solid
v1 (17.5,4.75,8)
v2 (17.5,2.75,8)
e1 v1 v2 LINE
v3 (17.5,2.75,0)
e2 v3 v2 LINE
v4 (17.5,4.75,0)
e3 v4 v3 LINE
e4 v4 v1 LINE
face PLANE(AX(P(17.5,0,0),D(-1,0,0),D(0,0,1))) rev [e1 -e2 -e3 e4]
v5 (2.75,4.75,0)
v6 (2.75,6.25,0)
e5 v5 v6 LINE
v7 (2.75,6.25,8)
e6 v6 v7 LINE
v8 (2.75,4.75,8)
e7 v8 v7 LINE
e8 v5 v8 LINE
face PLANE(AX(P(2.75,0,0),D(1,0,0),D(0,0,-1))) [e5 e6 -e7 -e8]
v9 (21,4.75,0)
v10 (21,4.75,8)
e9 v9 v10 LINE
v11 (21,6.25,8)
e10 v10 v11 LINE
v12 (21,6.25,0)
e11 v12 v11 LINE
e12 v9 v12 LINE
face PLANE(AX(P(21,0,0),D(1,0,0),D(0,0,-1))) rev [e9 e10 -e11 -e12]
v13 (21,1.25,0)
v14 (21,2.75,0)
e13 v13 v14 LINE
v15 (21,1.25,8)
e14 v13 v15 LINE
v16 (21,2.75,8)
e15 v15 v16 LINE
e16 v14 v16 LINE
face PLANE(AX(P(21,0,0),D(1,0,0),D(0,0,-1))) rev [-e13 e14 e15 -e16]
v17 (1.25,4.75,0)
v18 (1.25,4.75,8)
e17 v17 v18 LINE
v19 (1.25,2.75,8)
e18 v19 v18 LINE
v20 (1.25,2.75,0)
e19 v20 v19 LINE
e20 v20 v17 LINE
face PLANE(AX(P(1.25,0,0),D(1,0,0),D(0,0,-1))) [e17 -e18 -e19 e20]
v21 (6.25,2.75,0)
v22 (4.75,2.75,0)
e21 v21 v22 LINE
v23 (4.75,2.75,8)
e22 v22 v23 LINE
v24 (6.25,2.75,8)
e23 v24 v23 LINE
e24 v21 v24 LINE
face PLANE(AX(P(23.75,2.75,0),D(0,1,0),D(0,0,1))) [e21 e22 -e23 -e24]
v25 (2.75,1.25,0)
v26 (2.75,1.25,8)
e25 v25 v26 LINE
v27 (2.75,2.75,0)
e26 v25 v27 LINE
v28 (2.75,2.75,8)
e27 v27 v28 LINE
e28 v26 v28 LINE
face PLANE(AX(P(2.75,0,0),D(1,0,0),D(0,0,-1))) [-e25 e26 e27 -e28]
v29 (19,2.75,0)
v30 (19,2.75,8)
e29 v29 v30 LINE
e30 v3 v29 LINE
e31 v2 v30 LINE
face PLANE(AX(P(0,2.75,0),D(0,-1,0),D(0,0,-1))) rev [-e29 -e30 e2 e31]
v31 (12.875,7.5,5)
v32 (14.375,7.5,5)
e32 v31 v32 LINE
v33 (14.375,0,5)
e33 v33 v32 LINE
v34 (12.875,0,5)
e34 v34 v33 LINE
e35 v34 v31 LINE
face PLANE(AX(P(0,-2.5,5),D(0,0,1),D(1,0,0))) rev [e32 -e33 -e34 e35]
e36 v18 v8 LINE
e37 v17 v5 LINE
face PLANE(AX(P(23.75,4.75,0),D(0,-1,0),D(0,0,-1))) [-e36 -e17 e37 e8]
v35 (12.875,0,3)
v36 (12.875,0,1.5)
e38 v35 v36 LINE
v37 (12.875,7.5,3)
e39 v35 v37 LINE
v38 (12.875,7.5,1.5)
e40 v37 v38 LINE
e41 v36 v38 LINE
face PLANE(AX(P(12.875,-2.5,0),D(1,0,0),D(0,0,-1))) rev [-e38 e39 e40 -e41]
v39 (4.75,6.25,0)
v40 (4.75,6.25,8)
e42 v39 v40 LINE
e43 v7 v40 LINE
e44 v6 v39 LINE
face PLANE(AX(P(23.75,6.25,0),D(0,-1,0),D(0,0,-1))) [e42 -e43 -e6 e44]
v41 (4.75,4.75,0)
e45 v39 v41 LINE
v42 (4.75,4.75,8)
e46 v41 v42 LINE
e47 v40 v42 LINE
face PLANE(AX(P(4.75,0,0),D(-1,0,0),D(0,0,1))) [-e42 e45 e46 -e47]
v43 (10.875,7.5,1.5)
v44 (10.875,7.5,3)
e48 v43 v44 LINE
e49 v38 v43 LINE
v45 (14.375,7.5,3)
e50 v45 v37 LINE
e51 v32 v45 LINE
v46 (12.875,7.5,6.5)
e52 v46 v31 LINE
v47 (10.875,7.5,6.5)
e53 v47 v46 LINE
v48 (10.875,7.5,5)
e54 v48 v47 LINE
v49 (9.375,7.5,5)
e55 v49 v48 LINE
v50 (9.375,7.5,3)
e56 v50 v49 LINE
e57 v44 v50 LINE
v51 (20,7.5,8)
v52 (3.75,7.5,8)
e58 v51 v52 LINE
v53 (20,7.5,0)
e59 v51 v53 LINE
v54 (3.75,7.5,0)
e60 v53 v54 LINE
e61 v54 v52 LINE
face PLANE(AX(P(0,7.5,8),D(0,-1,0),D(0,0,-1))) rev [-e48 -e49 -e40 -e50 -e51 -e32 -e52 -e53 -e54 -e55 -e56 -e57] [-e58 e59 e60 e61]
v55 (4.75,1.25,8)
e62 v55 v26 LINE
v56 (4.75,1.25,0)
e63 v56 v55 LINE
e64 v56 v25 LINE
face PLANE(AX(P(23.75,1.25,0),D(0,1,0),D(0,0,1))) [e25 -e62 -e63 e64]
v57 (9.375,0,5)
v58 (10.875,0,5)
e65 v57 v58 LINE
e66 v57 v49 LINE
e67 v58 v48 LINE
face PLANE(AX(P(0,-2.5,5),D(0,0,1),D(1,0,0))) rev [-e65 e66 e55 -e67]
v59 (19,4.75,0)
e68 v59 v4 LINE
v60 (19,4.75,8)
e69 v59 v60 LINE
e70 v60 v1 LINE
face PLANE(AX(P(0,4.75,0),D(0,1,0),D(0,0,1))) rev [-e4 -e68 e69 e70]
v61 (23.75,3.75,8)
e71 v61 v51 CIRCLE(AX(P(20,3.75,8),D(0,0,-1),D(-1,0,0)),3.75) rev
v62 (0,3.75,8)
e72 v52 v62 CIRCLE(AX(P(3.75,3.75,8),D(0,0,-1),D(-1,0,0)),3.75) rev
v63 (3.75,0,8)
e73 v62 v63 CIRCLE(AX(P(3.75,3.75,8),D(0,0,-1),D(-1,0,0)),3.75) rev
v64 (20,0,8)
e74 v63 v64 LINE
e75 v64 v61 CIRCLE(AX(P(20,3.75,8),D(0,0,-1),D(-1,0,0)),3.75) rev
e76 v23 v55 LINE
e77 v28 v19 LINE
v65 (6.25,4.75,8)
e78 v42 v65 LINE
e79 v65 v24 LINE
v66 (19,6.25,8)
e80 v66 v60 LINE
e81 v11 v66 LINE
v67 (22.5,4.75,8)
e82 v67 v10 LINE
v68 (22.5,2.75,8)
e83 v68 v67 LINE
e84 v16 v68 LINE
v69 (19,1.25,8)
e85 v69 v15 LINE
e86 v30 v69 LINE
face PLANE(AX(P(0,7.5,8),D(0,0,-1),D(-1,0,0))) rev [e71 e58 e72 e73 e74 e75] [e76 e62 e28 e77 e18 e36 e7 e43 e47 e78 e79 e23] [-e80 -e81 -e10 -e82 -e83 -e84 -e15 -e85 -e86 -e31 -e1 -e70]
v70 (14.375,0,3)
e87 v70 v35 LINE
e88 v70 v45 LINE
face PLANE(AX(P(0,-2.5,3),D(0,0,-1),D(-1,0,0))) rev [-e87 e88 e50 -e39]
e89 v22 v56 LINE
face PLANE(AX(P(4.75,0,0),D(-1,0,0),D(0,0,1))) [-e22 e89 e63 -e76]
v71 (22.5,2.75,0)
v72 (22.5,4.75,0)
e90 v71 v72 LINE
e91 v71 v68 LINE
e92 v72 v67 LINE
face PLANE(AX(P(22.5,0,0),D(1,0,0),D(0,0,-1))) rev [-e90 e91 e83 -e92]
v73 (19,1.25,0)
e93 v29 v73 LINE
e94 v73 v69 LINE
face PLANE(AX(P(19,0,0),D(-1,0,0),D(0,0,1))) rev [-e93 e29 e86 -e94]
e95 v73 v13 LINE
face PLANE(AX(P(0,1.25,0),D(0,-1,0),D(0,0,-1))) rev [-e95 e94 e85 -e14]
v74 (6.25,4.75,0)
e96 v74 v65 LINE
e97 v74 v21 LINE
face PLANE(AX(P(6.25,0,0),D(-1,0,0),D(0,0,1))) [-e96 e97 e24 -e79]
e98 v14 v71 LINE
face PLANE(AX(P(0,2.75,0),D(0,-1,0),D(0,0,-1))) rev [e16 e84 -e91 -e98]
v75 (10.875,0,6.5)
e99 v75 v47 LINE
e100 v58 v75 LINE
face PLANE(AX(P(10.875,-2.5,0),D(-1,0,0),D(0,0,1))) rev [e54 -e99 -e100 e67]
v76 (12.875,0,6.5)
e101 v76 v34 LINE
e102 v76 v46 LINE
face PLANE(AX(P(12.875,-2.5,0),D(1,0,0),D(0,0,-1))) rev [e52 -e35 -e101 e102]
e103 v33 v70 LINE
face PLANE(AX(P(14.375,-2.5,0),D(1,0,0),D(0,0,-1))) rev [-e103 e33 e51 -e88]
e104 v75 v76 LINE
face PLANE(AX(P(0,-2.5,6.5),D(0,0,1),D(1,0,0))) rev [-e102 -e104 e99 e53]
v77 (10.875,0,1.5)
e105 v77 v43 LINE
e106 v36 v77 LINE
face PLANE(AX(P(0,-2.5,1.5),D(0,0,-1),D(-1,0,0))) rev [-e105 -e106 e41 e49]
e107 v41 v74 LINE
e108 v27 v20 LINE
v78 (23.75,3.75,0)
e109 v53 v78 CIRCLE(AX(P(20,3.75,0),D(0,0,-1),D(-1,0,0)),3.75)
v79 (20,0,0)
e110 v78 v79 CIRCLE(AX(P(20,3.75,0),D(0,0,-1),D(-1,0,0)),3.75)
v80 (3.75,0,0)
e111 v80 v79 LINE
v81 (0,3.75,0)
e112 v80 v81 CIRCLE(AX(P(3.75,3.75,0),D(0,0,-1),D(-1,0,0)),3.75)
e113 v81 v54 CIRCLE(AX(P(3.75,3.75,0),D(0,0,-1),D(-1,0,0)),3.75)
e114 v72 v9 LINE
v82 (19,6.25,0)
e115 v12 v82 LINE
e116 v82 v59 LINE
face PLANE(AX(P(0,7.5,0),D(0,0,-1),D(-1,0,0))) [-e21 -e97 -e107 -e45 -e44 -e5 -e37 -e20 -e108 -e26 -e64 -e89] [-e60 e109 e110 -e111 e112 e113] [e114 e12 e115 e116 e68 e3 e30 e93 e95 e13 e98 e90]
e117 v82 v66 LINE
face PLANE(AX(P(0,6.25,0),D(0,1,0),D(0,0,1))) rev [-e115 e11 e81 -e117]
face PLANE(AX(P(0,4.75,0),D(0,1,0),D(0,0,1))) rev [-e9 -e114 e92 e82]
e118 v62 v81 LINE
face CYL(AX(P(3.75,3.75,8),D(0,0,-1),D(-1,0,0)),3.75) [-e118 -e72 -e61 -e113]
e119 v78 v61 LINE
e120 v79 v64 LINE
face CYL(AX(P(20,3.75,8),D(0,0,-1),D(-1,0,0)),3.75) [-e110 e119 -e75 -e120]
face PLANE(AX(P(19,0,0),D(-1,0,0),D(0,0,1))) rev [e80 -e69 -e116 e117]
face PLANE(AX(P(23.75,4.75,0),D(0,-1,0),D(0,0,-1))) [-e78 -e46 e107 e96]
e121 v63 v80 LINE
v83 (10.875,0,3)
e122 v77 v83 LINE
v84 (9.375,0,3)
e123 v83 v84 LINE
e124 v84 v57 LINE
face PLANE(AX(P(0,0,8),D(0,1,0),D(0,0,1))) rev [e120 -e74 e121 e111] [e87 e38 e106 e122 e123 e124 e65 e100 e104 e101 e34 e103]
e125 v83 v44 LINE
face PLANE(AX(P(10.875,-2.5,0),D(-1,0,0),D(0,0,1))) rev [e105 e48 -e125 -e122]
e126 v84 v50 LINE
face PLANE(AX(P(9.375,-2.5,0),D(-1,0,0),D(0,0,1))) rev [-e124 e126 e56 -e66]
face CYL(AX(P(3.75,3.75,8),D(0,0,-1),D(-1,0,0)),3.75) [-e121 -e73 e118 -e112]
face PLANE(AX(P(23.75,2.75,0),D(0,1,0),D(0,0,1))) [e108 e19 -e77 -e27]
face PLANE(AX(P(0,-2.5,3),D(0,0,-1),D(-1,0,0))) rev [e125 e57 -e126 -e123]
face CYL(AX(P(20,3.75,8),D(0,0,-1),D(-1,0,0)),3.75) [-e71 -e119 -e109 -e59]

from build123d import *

# Parameters (mm, degrees)
SKETCH1_W           = 23.75
SKETCH1_H           = 7.5
BOSS_EXTRUDE1_DEPTH = 8
FILLET1_R           = 3.75
FILLET2_R           = 3.75
CUT_EXTRUDE13_DEPTH = 27.159367347
CUT_EXTRUDE14_DEPTH = 10


with BuildPart() as part:
    # Sketch1 → Boss-Extrude1 (new body)
    with BuildSketch(Plane.XY):
        with Locations((11.875, 3.75)):
            Rectangle(SKETCH1_W, SKETCH1_H)
    extrude(amount=BOSS_EXTRUDE1_DEPTH)

    # Fillet1
    fillet1_edges = [part.edges().sort_by_distance(p)[0] for p in [
        (23.75, 0, 4),
        (23.75, 7.5, 4),
    ]]
    fillet(fillet1_edges, radius=FILLET1_R - 0.0001)  # a hair under: the kernel refuses the full size

    # Fillet2
    fillet2_edges = [part.edges().sort_by_distance(p)[0] for p in [
        (0, 0, 4),
        (0, 7.5, 4),
    ]]
    fillet(fillet2_edges, radius=FILLET2_R - 0.0001)  # a hair under: the kernel refuses the full size

    # Sketch17 → Cut-Extrude13 (cut, through all)
    with BuildSketch(Plane.XY.offset(8)):
        Polygon((21, 6.25), (20, 6.25), (20, 3.75), (22.5, 3.75), (22.5, 4.75), (21, 4.75), align=None)
        Polygon((20, 3.75), (20, 6.25), (19, 6.25), (19, 4.75), (17.5, 4.75), (17.5, 2.75), (19, 2.75), (19, 1.25), (20, 1.25), align=None)
        Polygon((22.5, 3.75), (20, 3.75), (20, 1.25), (21, 1.25), (21, 2.75), (22.5, 2.75), align=None)
    cut_extrude13 = extrude(amount=-CUT_EXTRUDE13_DEPTH, mode=Mode.SUBTRACT)

    # Mirror4: Cut-Extrude13 across plane
    add(cut_extrude13.mirror(Plane(origin=(11.875, 0, 0), x_dir=(0, 0, 1), z_dir=(1, 0, 0))), mode=Mode.SUBTRACT)

    # Sketch18 → Cut-Extrude14 (cut)
    with BuildSketch(Plane(origin=(0, 7.5, 0), x_dir=(1, 0, 0), z_dir=(0, 1, 0))):
        Polygon((14.375, -4), (11.875, -4), (11.875, -6.5), (12.875, -6.5), (12.875, -5), (14.375, -5), align=None)
        Polygon((11.875, -4), (13.90625, -3), (12.875, -3), (12.875, -1.5), (11.875, -1.5), align=None)
        Polygon((14.375, -3), (13.90625, -3), (11.875, -4), (14.375, -4), align=None)
        Polygon((9.84375, -5), (11.875, -4), (11.875, -1.5), (10.875, -1.5), (10.875, -3), (9.375, -3), (9.375, -5), align=None)
        Polygon((11.875, -6.5), (11.875, -4), (9.84375, -5), (10.875, -5), (10.875, -6.5), align=None)
    extrude(amount=-CUT_EXTRUDE14_DEPTH, mode=Mode.SUBTRACT)


solid = part.part
